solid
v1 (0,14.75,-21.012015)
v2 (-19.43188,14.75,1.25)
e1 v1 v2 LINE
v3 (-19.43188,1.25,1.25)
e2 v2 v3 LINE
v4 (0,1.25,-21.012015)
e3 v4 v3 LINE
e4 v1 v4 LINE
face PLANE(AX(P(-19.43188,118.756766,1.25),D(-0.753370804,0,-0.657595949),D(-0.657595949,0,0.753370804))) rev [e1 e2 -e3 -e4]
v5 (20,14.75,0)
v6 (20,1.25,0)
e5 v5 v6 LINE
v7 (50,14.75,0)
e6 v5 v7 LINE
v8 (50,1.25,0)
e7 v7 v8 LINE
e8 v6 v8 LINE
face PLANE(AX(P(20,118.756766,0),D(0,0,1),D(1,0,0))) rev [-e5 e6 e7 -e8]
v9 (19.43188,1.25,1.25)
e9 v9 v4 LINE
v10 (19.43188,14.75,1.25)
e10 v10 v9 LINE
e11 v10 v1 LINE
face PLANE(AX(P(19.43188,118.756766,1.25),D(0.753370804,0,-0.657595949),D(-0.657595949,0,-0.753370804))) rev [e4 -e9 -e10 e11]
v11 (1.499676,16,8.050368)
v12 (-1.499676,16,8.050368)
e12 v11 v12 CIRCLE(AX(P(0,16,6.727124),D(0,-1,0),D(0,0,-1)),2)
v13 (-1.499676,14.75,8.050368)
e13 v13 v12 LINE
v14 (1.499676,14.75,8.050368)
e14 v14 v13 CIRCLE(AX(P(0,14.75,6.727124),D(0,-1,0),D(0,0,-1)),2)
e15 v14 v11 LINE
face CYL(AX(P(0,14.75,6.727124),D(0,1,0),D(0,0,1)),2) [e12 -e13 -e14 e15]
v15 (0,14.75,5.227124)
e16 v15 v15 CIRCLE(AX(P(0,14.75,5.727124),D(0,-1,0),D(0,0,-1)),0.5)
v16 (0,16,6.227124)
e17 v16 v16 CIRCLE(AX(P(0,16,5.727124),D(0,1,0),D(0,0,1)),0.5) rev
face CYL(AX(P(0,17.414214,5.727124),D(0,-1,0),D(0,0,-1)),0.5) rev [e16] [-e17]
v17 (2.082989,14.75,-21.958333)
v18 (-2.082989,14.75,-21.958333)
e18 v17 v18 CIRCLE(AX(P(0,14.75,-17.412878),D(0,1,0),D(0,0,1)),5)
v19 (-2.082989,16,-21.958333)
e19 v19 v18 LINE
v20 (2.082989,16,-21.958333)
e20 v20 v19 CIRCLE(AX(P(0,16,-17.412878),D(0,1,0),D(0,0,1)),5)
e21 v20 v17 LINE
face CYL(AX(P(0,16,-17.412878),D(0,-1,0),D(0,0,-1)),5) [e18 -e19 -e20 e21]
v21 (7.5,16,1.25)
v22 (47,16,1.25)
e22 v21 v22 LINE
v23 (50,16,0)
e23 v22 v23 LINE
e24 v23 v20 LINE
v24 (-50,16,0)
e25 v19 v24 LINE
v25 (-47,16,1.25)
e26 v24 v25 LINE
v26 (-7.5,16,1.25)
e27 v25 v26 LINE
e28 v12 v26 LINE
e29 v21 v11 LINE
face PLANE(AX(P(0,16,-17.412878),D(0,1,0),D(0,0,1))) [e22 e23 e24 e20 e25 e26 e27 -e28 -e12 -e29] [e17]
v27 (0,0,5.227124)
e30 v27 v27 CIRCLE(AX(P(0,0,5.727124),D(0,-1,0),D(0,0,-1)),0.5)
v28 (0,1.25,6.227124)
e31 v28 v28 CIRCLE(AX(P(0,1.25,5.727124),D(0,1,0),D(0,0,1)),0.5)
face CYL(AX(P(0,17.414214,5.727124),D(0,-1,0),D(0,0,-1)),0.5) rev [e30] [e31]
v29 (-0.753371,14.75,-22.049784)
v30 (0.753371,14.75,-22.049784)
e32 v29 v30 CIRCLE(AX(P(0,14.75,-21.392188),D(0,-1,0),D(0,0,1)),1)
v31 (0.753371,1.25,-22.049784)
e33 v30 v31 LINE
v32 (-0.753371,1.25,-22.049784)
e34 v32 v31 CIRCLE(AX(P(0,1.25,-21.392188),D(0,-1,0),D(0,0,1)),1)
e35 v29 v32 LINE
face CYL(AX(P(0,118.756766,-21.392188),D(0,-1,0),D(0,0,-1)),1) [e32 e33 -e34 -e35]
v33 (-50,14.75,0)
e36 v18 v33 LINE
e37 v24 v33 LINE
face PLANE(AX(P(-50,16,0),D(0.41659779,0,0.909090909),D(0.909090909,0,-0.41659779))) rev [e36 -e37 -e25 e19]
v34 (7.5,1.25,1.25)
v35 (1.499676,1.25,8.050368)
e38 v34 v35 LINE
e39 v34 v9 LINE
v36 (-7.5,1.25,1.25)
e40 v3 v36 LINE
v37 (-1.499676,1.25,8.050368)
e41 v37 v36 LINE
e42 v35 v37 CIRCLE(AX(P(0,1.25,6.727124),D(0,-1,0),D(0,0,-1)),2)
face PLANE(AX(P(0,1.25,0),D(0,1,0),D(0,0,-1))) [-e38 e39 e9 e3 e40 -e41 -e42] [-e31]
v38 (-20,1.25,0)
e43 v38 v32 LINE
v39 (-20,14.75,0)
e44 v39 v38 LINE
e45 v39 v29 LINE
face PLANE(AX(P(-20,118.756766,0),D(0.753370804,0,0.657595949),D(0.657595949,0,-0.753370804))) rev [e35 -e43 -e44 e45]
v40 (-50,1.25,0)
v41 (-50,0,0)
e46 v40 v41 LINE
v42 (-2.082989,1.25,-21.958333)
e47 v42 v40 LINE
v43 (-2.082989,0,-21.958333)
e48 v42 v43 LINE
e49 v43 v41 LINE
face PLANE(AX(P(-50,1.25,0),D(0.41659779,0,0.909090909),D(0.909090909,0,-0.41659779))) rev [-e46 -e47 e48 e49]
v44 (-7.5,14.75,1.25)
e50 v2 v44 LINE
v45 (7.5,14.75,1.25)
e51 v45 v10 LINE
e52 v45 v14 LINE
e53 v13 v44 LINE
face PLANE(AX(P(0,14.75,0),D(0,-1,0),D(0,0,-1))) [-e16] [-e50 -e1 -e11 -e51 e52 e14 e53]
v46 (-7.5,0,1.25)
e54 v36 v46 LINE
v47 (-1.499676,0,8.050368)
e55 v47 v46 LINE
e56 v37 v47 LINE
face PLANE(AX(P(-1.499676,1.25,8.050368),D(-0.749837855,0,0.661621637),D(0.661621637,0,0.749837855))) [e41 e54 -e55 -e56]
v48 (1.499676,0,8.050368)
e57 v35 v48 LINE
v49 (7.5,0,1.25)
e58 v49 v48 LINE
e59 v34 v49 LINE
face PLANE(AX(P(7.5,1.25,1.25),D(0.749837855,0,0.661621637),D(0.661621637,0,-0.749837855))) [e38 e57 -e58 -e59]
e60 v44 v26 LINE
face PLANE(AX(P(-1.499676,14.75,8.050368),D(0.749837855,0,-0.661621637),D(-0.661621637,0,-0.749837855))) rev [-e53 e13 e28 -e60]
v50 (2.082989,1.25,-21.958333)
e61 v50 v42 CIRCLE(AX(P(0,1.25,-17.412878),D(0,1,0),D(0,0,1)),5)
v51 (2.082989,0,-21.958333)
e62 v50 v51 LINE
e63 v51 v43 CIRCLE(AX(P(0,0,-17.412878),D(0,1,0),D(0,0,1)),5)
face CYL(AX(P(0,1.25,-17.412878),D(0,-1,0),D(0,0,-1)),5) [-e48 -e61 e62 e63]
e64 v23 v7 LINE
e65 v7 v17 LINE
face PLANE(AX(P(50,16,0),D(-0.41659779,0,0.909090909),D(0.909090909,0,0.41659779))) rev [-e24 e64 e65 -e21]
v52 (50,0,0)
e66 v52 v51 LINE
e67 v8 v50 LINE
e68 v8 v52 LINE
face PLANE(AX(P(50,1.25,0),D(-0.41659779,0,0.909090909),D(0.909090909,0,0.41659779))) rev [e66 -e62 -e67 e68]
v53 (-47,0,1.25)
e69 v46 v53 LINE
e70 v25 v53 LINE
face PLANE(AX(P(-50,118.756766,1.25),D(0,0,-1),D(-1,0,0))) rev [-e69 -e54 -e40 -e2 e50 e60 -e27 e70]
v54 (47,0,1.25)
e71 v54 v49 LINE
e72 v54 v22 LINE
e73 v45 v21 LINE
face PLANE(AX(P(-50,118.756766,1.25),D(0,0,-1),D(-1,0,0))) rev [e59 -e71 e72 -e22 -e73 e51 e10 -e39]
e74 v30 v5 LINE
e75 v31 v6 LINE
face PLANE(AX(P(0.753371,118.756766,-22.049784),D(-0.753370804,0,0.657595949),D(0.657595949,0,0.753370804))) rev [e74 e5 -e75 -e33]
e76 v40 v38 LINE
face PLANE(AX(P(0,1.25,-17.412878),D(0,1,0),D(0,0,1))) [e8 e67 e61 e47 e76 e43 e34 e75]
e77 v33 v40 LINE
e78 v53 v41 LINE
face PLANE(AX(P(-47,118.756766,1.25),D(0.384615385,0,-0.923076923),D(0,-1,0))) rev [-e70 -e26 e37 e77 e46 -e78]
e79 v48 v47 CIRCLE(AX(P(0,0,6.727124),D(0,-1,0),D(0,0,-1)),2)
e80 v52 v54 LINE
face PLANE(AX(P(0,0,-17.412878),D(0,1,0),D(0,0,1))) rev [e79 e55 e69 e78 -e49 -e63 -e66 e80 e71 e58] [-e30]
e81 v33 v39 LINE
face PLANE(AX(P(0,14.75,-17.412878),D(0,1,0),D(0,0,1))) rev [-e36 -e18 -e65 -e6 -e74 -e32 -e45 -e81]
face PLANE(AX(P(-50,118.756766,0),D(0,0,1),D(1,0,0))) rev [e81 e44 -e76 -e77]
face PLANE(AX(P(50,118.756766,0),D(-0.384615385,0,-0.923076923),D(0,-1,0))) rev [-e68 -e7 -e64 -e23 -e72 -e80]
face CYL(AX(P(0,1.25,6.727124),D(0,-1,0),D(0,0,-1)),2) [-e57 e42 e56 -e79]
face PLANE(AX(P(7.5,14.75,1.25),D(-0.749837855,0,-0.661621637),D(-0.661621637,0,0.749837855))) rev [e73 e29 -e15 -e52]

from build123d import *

# Parameters (mm, degrees)
BOSS_EXTRUDE1_DEPTH  = 1.25
BOSS_EXTRUDE8_START  = -8
BOSS_EXTRUDE8_DEPTH  = 16
CHAMFER2_SIZE2       = 3
CHAMFER2_SIZE        = 1.25
CHAMFER3_SIZE2       = 3
CHAMFER3_SIZE        = 1.25
BOSS_EXTRUDE9_DEPTH  = 1.25
BOSS_EXTRUDE10_DEPTH = 1.25
CUT_EXTRUDE1_REACH   = 59.082
SKETCH6_R            = 0.5


with BuildPart() as part:
    # Sketch1 → Boss-Extrude1 (new body)
    with BuildSketch(Plane(origin=(0, 0, 0), x_dir=(1, 0, 0), z_dir=(0, 1, 0))):
        with BuildLine():
            Line((-50, 0), (-2.082988952, 21.95833302))
            ThreePointArc((-2.082988952, 21.95833302), (0, 22.412878475), (2.082988952, 21.95833302))
            Line((2.082988952, 21.95833302), (50, 0))
            Line((50, 0), (20, 0))
            Line((20, 0), (0.753370804, 22.049783791))
            ThreePointArc((0.753370804, 22.049783791), (0, 22.392187842), (-0.753370804, 22.049783791))
            Line((-0.753370804, 22.049783791), (-20, 0))
            Line((-20, 0), (-50, 0))
        make_face()
    extrude(amount=BOSS_EXTRUDE1_DEPTH)


with BuildPart() as body_2:
    # Body-Move/Copy1: copy of part
    add(part.part.moved(Location((0, 14.75, 0))))


with BuildPart() as part_1:
    add(part.part)

    add(body_2.part)  # Boss-Extrude8 merges body 2
    # Sketch3 → Boss-Extrude8 (add)
    with BuildSketch(Plane(origin=(0, 8, 0), x_dir=(1, 0, 0), z_dir=(0, 1, 0)).offset(BOSS_EXTRUDE8_START)):
        with BuildLine():
            Line((19.431879943, -1.25), (0, 21.012015184))
            Line((0, 21.012015184), (-19.431879943, -1.25))
            Line((-19.431879943, -1.25), (-50, -1.25))
            Line((-50, -1.25), (-50, 0))
            Line((-50, 0), (-20, 0))
            Line((-20, 0), (-0.753370804, 22.049783791))
            ThreePointArc((-0.753370804, 22.049783791), (0, 22.392187842), (0.753370804, 22.049783791))
            Line((0.753370804, 22.049783791), (20, 0))
            Line((20, 0), (50, 0))
            Line((50, 0), (50, -1.25))
            Line((50, -1.25), (19.431879943, -1.25))
        make_face()
    extrude(amount=BOSS_EXTRUDE8_DEPTH)

    # Chamfer2
    chamfer2_edges = [part_1.edges().sort_by_distance(p)[0] for p in [
        (50, 8, 1.25),
    ]]
    chamfer2_side = [part_1.faces().sort_by_distance(p)[0] for p in [
        (50, 8, 1.225),
    ]]
    chamfer(chamfer2_edges, length=CHAMFER2_SIZE - 0.0001, length2=CHAMFER2_SIZE2 - 0.0001, reference=chamfer2_side[0])  # a hair under: the kernel refuses the full size

    # Chamfer3
    chamfer3_edges = [part_1.edges().sort_by_distance(p)[0] for p in [
        (-50, 8, 1.25),
    ]]
    chamfer3_side = [part_1.faces().sort_by_distance(p)[0] for p in [
        (-50, 8, 1.225),
    ]]
    chamfer(chamfer3_edges, length=CHAMFER3_SIZE - 0.0001, length2=CHAMFER3_SIZE2 - 0.0001, reference=chamfer3_side[0])  # a hair under: the kernel refuses the full size

    # Sketch4 → Boss-Extrude9 (add)
    with BuildSketch(Plane(origin=(0, 16, 0), x_dir=(1, 0, 0), z_dir=(0, 1, 0))):
        Polygon((-19.431879943, -1.25), (0, 21.012015184), (19.431879943, -1.25), align=None)
    boss_extrude9 = extrude(amount=-BOSS_EXTRUDE9_DEPTH)

    # Mirror1: Boss-Extrude9 across plane
    add(boss_extrude9.mirror(Plane.ZX.offset(8)))

    # Sketch5 → Boss-Extrude10 (add)
    with BuildSketch(Plane.XZ):
        with BuildLine():
            Line((-7.5, 1.25), (7.5, 1.25))
            Line((7.5, 1.25), (1.499675711, 8.050367528))
            ThreePointArc((1.499675711, 8.050367528), (0, 8.727124254), (-1.499675711, 8.050367528))
            Line((-1.499675711, 8.050367528), (-7.5, 1.25))
        make_face()
    boss_extrude10 = extrude(amount=-BOSS_EXTRUDE10_DEPTH)

    # Mirror2: Boss-Extrude10 across plane
    add(boss_extrude10.mirror(Plane.ZX.offset(8)))

    # Sketch6 → Cut-Extrude1 (cut, up to next)
    with BuildSketch(Plane(origin=(0, 0, 0), x_dir=(-1, 0, 0), z_dir=(0, -1, 0)), mode=Mode.PRIVATE) as cut_extrude1_sk1:
        with Locations(Location((0, -5.727124254, 0), (0, 0, 90))):
            Circle(SKETCH6_R)
    cut_extrude1_tool1 = extrude(cut_extrude1_sk1.sketch, amount=-CUT_EXTRUDE1_REACH, mode=Mode.PRIVATE) & part_1.part
    add(cut_extrude1_tool1.solids().sort_by_distance((0, 0, 5.727124))[0], mode=Mode.SUBTRACT)
    add(cut_extrude1_tool1.solids().sort_by_distance((0, 0, 5.727124))[1], mode=Mode.SUBTRACT)


solid = part_1.part
